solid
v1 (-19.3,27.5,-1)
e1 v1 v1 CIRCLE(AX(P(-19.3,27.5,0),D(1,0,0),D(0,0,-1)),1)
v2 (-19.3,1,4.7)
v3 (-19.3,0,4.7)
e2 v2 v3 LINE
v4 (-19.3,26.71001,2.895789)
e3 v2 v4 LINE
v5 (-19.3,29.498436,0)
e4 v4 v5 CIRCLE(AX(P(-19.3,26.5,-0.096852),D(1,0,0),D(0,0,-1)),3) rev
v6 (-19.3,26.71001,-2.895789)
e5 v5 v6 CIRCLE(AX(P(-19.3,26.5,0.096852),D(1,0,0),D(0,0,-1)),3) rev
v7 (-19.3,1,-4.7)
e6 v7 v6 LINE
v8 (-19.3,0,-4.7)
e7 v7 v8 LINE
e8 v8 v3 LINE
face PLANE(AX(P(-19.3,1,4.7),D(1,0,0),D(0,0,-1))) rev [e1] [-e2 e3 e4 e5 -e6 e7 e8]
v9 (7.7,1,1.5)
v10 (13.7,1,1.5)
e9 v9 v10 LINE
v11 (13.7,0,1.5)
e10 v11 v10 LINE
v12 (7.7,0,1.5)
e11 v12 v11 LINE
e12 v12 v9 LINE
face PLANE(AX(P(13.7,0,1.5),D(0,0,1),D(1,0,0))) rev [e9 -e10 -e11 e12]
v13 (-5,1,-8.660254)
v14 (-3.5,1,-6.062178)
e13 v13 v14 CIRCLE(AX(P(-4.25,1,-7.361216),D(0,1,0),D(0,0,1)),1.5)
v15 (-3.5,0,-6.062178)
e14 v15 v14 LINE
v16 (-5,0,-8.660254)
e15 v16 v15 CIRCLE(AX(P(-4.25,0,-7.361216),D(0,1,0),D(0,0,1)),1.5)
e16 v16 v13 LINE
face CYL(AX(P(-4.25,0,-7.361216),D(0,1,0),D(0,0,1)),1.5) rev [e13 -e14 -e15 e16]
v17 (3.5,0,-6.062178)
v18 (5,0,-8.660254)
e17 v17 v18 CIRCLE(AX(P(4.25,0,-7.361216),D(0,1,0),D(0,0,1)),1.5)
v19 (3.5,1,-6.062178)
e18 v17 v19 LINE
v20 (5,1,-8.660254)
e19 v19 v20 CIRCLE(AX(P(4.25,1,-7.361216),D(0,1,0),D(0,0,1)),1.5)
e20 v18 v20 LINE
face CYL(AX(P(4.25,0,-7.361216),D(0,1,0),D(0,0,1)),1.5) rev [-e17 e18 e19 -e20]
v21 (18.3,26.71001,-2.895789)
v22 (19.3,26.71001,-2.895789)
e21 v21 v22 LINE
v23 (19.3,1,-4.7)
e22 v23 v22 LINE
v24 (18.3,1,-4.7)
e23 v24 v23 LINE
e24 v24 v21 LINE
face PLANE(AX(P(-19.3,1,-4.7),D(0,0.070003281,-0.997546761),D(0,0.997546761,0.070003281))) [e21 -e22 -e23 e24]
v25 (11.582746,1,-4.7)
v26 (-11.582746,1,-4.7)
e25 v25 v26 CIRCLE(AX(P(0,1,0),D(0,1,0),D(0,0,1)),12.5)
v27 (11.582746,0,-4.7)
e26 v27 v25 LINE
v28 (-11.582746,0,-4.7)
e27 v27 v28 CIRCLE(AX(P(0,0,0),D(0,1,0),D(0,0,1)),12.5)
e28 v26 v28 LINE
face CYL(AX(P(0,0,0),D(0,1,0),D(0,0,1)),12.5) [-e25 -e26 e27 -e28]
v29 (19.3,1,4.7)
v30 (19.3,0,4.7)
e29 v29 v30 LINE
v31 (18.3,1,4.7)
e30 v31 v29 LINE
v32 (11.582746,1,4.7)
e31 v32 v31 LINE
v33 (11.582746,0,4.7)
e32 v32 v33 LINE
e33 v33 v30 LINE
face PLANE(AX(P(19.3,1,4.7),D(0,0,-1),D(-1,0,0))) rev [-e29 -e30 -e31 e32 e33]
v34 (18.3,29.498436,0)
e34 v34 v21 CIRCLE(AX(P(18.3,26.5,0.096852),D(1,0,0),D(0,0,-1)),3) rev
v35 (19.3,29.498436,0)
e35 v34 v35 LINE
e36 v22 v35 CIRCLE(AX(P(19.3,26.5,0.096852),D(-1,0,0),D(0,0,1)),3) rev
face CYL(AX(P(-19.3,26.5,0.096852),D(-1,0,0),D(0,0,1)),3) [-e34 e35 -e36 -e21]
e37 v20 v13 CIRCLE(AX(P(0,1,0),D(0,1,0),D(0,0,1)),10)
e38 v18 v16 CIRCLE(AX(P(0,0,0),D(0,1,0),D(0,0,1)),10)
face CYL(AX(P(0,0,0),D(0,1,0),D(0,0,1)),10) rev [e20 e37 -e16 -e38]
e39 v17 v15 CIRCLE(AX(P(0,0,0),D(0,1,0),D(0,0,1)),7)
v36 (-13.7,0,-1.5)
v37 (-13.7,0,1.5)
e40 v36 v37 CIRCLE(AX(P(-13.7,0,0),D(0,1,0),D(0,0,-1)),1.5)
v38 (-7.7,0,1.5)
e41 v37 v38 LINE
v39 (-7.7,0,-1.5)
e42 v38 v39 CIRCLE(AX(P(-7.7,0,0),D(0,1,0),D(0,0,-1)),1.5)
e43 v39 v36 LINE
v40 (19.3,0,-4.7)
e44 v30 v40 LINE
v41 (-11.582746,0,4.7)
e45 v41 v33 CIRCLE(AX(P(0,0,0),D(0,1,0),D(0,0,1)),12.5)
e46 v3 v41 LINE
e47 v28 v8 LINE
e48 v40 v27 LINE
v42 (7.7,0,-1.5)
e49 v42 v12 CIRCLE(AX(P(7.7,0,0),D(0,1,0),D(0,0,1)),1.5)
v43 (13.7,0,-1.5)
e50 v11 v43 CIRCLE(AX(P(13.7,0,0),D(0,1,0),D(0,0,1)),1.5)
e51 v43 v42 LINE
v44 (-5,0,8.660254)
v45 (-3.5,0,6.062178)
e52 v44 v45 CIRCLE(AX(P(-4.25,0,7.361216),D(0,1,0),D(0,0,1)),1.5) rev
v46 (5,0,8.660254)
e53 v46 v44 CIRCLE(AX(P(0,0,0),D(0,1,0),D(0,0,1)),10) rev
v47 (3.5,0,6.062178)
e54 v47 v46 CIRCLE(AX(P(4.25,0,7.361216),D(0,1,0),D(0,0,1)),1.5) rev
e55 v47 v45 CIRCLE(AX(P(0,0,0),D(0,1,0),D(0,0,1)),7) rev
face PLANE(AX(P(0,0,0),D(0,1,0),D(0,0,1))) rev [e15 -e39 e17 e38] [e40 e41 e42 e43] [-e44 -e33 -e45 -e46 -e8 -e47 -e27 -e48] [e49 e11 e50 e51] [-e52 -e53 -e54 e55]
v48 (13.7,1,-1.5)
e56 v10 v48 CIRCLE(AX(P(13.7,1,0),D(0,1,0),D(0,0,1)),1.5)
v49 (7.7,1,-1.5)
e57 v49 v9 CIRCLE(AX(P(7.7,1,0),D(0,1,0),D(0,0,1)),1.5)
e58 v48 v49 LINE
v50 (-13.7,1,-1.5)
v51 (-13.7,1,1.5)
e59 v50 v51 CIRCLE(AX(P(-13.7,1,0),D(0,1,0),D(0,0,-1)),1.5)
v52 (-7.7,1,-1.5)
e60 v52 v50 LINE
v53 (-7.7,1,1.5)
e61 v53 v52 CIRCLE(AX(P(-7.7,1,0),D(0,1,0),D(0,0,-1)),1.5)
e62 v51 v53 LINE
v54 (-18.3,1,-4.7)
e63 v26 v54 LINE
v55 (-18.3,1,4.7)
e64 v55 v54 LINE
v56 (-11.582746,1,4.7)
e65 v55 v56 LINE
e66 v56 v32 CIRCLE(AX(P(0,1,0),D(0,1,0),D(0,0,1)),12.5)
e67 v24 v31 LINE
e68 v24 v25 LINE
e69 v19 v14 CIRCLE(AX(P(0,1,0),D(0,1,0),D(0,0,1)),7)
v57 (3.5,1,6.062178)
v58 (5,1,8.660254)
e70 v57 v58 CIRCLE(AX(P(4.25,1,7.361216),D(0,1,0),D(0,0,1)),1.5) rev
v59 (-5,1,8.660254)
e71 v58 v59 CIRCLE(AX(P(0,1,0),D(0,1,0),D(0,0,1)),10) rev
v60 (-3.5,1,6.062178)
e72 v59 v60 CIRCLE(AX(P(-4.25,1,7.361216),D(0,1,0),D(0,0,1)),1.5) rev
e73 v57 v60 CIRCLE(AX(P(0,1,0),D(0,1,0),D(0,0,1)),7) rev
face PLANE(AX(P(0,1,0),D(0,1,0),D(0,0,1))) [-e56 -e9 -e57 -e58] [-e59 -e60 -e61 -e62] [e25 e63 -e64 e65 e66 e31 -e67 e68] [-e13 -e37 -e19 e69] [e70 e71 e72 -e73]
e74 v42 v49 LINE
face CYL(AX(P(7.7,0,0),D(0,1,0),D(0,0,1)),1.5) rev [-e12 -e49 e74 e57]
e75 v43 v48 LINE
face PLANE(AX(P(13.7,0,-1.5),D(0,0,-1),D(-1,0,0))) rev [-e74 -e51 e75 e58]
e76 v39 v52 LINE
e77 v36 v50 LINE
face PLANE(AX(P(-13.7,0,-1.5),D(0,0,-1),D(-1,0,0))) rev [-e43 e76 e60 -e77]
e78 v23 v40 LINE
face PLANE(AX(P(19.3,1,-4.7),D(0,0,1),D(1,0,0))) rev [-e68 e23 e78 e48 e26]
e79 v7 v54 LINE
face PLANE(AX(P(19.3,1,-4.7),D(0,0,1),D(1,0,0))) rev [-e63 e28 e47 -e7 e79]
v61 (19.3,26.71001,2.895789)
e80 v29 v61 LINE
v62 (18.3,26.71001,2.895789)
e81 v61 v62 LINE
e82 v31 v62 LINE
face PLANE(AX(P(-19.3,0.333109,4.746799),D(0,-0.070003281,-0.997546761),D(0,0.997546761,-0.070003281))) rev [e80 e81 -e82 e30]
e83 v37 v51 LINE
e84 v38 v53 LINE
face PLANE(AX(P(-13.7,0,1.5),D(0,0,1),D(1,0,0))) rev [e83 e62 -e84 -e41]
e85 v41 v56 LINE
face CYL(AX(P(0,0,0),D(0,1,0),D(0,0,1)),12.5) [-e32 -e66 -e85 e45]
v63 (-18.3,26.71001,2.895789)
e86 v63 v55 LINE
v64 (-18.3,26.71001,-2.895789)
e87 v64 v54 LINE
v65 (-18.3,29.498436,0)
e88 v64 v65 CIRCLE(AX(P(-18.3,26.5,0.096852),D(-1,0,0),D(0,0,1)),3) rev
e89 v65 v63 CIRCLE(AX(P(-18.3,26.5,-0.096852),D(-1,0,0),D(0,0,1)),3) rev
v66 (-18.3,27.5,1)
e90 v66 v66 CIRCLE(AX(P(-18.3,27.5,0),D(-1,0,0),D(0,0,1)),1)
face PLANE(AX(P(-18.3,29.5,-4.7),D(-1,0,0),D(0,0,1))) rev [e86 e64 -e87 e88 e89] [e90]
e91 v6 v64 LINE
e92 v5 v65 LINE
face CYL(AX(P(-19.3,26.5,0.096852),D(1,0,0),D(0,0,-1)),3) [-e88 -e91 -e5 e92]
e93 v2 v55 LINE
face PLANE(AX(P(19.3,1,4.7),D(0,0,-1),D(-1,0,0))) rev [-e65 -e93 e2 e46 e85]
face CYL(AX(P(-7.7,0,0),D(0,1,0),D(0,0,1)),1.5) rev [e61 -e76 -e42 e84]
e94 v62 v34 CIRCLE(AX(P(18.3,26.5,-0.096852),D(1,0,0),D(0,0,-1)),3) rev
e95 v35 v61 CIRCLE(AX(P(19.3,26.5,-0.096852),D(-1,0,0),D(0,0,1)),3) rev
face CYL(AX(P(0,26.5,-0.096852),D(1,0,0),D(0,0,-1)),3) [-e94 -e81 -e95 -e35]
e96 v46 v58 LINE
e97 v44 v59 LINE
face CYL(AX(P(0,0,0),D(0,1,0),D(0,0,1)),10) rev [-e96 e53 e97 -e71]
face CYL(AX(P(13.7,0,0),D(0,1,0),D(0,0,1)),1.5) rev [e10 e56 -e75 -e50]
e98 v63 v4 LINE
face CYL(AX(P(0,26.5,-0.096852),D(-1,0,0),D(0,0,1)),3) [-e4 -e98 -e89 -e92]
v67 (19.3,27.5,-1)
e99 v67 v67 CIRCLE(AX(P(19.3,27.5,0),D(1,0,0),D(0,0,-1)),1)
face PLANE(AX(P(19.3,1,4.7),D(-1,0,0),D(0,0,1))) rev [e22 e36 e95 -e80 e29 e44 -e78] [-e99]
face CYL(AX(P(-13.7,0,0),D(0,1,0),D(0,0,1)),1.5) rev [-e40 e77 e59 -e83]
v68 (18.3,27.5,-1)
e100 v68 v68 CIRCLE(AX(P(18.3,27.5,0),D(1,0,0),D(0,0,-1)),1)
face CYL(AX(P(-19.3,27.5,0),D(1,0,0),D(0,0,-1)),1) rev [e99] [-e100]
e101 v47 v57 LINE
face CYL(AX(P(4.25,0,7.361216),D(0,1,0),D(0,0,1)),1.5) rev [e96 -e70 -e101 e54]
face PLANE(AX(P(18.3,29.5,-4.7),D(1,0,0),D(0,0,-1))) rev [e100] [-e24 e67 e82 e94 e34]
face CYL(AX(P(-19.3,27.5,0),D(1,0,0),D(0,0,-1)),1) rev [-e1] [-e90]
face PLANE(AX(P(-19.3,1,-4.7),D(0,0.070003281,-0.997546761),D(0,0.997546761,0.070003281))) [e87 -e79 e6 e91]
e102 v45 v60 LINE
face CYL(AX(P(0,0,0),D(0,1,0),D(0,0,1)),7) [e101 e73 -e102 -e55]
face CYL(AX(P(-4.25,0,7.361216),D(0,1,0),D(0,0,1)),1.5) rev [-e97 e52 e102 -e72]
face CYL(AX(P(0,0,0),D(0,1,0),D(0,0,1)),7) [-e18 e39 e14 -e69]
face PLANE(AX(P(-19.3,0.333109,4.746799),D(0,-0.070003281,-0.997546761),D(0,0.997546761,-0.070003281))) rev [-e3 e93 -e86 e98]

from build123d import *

# Parameters (mm, degrees)
SKETCH_2_W          = 38.6
SKETCH_2_H          = 9.4
EXTRUDE_1_DEPTH     = 1
SKETCH_3_W          = 1
SKETCH_3_H          = 9.4
EXTRUDE_2_DEPTH     = 28.5
SKETCH_4_R          = 12.5
EXTRUDE_3_DEPTH     = 1
CUT_EXTRUDE_1_DEPTH = 37.619530308
CUT_EXTRUDE_2_DEPTH = 51.164329957
SKETCH_7_R          = 1
CUT_EXTRUDE_3_DEPTH = 51.164329957
FILLET_1_R          = 3


with BuildPart() as part:
    # 草图2 → 凸台-拉伸1 (new body)
    with BuildSketch(Plane(origin=(0, 0, 0), x_dir=(1, 0, 0), z_dir=(0, 1, 0))):
        Rectangle(SKETCH_2_W, SKETCH_2_H)
    extrude(amount=EXTRUDE_1_DEPTH)

    # 草图3 → 凸台-拉伸2 (add)
    with BuildSketch(Plane(origin=(0, 1, 0), x_dir=(1, 0, 0), z_dir=(0, 1, 0))):
        with Locations((-18.8, 0)):
            Rectangle(SKETCH_3_W, SKETCH_3_H)
        with Locations((18.8, 0)):
            Rectangle(SKETCH_3_W, SKETCH_3_H)
    extrude(amount=EXTRUDE_2_DEPTH)

    # 草图4 → 凸台-拉伸3 (add)
    with BuildSketch(Plane(origin=(0, 1, 0), x_dir=(1, 0, 0), z_dir=(0, 1, 0))):
        Circle(SKETCH_4_R)
        with BuildLine():
            ThreePointArc((5, -8.660254038), (0, -10), (-5, -8.660254038))
            ThreePointArc((-5, -8.660254038), (-5.549038106, -6.611215932), (-3.5, -6.062177826))
            ThreePointArc((-3.5, -6.062177826), (0, -7), (3.5, -6.062177826))
            ThreePointArc((3.5, -6.062177826), (5.549038106, -6.611215932), (5, -8.660254038))
        make_face(mode=Mode.SUBTRACT)
        with BuildLine():
            ThreePointArc((5, 8.660254038), (0, 10), (-5, 8.660254038))
            ThreePointArc((-5, 8.660254038), (-5.549038106, 6.611215932), (-3.5, 6.062177826))
            ThreePointArc((-3.5, 6.062177826), (0, 7), (3.5, 6.062177826))
            ThreePointArc((3.5, 6.062177826), (5.549038106, 6.611215932), (5, 8.660254038))
        make_face(mode=Mode.SUBTRACT)
    extrude(amount=-EXTRUDE_3_DEPTH)

    # 草图5 → 切除-拉伸1 (cut, through all)
    with BuildSketch(Plane(origin=(0, 1, 0), x_dir=(1, 0, 0), z_dir=(0, 1, 0))):
        with BuildLine():
            Line((13.7, -1.5), (7.7, -1.5))
            ThreePointArc((7.7, -1.5), (6.2, 0), (7.7, 1.5))
            Line((7.7, 1.5), (13.7, 1.5))
            ThreePointArc((13.7, 1.5), (15.2, 0), (13.7, -1.5))
        make_face()
        with BuildLine():
            Line((-13.7, -1.5), (-7.7, -1.5))
            ThreePointArc((-7.7, -1.5), (-6.2, 0), (-7.7, 1.5))
            Line((-7.7, 1.5), (-13.7, 1.5))
            ThreePointArc((-13.7, 1.5), (-15.2, 0), (-13.7, -1.5))
        make_face()
    extrude(amount=-CUT_EXTRUDE_1_DEPTH, mode=Mode.SUBTRACT)

    # 草图6 → 切除-拉伸2 (cut, through all)
    with BuildSketch(Plane(origin=(19.3, 0, 0), x_dir=(0, 0, -1), z_dir=(1, 0, 0))):
        Polygon((-4.7, 29.5), (-4.7, 1), (-2.7, 29.5), align=None)
        Polygon((4.7, 1), (2.7, 29.5), (4.7, 29.5), align=None)
    extrude(amount=-CUT_EXTRUDE_2_DEPTH, mode=Mode.SUBTRACT)

    # 草图7 → 切除-拉伸3 (cut, through all)
    with BuildSketch(Plane(origin=(19.3, 0, 0), x_dir=(0, 0, -1), z_dir=(1, 0, 0))):
        with Locations((0, 27.5)):
            Circle(SKETCH_7_R)
    extrude(amount=-CUT_EXTRUDE_3_DEPTH, mode=Mode.SUBTRACT)

    # 圆角1
    # the kernel refuses this fillet: 3 mm, written as the material it takes off along each edge
    with BuildSketch(Plane(origin=(-11.307871249, 29.5, -2.7), x_dir=(0, -0.9975467611004155, -0.0700032814807308), z_dir=(-1, 0, 0))) as fillet_1_piece_1:
        with BuildLine():
            CenterArc((FILLET_1_R * 0.932283833485, FILLET_1_R), FILLET_1_R, 184.014175695, 85.985824305)
            Line((-FILLET_1_R * 0.0652629276154, FILLET_1_R * 0.929996718519), (0, 0))
            Line((0, 0), (FILLET_1_R * 0.932283833485, 0))
        make_face()
    extrude(amount=14.984257502, mode=Mode.SUBTRACT)
    with BuildSketch(Plane(origin=(-11.307871249, 29.5, 2.7), x_dir=(0, -0.9975467611004155, 0.0700032814807308), z_dir=(-1, 0, 0)), Plane(origin=(26.292128751, 29.5, -2.7), x_dir=(0, 0, 1), z_dir=(-1, 0, 0)), Plane(origin=(26.292128751, 29.5, 2.7), x_dir=(0, -0.9975467611004155, 0.0700032814807308), z_dir=(-1, 0, 0))) as fillet_1_piece_2:
        with BuildLine():
            CenterArc((FILLET_1_R * 0.932283833485, -FILLET_1_R), FILLET_1_R, 90, 85.985824305)
            Line((-FILLET_1_R * 0.0652629276154, -FILLET_1_R * 0.929996718519), (0, 0))
            Line((0, 0), (FILLET_1_R * 0.932283833485, 0))
        make_face()
    extrude(amount=14.984257502, mode=Mode.SUBTRACT)


solid = part.part
